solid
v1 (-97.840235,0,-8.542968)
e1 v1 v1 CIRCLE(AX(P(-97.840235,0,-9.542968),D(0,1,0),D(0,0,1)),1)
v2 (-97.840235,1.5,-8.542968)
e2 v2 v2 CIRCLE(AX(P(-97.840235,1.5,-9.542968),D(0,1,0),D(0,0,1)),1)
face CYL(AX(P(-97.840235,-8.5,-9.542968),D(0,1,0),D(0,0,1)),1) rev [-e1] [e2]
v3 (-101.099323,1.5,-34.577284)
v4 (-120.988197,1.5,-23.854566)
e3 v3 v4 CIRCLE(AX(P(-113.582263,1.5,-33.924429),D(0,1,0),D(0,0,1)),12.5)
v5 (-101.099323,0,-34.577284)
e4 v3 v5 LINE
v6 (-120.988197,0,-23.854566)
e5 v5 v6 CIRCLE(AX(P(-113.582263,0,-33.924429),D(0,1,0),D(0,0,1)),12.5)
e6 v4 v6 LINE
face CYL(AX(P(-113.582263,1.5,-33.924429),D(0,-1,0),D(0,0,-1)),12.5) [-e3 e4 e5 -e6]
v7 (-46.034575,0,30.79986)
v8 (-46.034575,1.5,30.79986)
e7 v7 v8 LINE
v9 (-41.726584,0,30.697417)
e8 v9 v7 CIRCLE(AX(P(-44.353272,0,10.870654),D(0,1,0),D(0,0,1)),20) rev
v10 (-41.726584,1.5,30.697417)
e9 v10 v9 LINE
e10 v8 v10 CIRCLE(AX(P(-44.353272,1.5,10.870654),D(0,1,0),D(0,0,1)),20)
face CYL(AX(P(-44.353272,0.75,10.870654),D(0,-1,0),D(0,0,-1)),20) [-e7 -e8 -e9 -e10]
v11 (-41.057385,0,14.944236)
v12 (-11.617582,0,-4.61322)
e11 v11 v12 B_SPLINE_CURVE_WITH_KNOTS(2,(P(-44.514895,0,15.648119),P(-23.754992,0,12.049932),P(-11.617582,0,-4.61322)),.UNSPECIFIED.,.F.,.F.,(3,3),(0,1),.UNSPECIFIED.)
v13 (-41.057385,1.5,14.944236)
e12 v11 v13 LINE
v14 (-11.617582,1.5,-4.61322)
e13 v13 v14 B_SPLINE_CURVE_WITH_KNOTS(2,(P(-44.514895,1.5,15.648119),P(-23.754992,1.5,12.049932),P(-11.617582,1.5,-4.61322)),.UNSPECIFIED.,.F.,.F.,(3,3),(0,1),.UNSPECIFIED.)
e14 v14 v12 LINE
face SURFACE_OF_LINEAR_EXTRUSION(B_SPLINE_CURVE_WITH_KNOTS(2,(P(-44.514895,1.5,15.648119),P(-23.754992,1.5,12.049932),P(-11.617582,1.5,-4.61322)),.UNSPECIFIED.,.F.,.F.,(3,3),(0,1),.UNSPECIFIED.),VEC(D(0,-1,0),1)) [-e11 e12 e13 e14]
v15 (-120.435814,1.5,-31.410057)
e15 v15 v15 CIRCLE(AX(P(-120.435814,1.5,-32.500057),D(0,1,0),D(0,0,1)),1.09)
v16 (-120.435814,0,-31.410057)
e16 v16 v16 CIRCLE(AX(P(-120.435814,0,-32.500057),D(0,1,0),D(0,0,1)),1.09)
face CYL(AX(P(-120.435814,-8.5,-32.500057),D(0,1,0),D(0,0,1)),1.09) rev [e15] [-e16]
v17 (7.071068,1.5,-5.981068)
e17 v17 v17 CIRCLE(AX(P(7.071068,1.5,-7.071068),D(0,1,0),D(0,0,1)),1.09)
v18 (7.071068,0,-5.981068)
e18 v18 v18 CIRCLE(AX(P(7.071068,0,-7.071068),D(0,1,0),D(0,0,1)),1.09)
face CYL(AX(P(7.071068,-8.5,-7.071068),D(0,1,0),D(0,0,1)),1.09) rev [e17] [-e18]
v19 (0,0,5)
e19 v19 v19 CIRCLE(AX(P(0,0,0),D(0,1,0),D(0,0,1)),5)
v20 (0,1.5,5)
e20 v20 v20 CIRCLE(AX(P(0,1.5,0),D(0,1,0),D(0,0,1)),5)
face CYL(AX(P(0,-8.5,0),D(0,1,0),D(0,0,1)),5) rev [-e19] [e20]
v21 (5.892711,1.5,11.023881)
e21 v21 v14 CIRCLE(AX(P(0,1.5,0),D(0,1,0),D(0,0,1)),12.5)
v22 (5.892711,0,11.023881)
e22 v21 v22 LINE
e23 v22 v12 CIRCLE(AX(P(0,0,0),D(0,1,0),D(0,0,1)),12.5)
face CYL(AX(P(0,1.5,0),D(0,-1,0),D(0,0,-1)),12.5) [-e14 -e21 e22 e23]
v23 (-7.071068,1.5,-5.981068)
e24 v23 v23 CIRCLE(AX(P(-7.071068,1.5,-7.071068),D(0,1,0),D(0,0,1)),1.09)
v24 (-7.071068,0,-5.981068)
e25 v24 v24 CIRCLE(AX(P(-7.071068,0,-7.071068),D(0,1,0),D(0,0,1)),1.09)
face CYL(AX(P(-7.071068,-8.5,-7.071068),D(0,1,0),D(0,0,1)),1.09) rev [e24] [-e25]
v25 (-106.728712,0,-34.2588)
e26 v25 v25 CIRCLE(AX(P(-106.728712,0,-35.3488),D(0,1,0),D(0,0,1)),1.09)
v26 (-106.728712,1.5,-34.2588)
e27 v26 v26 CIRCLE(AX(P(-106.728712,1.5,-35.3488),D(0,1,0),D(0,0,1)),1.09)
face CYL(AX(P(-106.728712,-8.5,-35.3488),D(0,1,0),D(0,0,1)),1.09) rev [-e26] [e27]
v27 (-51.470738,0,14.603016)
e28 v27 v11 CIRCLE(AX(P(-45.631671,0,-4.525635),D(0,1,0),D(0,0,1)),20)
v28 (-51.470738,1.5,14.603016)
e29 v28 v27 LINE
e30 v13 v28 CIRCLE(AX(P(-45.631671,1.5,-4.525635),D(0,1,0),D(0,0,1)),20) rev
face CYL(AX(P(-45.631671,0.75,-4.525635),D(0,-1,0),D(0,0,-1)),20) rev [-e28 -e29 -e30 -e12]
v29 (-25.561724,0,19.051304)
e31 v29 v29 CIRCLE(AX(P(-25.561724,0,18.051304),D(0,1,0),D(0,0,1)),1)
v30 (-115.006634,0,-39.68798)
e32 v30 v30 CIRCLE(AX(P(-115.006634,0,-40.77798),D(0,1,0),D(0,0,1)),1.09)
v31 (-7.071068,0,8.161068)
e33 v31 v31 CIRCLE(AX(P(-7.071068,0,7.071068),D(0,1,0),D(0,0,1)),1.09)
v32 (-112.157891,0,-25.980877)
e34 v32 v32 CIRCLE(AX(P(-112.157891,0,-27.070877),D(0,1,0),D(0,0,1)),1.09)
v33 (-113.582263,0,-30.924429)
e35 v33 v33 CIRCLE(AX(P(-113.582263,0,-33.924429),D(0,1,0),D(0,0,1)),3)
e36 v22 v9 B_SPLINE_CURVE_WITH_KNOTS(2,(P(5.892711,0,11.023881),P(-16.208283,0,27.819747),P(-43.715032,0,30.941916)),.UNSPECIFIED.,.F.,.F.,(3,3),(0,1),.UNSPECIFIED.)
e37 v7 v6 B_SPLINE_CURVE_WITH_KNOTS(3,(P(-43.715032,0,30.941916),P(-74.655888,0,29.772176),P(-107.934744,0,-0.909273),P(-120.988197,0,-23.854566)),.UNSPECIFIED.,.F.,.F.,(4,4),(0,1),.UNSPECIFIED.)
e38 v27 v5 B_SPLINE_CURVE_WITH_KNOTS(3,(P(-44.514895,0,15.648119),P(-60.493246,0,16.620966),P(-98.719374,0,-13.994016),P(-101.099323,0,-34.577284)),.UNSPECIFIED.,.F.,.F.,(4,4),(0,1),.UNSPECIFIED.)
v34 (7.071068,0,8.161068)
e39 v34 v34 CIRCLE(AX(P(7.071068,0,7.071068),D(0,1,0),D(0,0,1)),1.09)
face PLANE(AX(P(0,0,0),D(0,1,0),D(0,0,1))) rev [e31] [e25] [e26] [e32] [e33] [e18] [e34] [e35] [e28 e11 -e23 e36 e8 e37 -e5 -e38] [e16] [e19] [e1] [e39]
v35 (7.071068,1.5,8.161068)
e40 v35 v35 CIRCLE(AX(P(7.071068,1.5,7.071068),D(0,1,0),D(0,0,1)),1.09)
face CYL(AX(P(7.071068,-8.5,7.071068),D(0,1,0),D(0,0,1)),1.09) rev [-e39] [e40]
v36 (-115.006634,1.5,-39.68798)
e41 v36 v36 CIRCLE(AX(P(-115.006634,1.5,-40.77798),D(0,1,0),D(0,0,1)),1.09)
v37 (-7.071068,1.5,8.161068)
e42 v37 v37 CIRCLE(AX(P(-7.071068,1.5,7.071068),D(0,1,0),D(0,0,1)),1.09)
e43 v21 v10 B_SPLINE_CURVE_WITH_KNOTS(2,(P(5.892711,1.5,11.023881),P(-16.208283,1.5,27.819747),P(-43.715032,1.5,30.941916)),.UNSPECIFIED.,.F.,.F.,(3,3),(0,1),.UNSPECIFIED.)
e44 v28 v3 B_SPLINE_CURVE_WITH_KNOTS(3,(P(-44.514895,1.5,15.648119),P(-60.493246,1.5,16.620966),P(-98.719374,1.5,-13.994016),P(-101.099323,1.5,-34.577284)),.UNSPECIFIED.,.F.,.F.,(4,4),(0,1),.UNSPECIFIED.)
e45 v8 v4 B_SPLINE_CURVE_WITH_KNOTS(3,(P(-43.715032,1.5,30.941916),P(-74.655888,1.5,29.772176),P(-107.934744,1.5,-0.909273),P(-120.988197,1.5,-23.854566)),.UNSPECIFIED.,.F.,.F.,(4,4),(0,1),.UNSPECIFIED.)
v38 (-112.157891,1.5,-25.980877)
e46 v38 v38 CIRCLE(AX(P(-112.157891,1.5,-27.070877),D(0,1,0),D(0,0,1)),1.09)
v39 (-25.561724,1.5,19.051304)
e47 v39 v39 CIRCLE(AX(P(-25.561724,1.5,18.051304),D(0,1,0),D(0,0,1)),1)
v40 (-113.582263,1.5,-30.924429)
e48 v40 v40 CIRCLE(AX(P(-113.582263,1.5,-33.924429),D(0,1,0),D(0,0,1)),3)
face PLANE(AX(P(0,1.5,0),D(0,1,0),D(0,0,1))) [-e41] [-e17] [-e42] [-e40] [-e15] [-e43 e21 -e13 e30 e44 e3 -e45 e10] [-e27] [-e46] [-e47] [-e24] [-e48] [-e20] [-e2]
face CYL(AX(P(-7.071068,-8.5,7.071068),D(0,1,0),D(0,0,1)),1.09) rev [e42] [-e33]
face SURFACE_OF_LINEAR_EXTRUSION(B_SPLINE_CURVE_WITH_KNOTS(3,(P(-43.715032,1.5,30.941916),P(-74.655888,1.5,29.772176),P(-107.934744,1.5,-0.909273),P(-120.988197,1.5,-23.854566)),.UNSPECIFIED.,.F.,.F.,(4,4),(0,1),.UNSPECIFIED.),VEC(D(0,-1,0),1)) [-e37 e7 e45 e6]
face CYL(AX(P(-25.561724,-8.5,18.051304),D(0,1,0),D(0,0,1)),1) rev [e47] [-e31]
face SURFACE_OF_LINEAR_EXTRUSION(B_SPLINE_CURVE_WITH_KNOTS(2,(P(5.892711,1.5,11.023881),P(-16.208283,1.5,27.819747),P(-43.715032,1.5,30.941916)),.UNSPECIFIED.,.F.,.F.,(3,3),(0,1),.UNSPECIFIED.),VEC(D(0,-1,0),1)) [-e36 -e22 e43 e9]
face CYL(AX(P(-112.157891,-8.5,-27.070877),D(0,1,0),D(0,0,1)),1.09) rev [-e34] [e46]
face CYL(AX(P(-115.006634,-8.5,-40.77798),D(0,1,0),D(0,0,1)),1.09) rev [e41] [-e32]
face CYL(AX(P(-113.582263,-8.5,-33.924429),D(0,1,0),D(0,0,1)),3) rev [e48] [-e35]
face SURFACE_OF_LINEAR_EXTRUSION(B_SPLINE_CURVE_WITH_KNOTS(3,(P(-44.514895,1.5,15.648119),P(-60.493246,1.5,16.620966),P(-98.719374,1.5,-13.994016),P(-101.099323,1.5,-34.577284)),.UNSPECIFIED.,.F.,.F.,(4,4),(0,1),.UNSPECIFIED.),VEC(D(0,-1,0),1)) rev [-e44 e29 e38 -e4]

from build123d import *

# Parameters (mm, degrees)
BOSS_EXTRUDE1_DEPTH = 1.5
FILLET2_R           = 20
FILLET3_R           = 20
SKETCH3_R           = 5
SKETCH3_R_2         = 1.09
SKETCH3_R_3         = 3
CUT_EXTRUDE2_DEPTH  = 10
SKETCH4_R           = 1
CUT_EXTRUDE3_DEPTH  = 10


with BuildPart() as part:
    # Sketch2 → Boss-Extrude1 (new body)
    with BuildSketch(Plane(origin=(0, 0, 0), x_dir=(1, 0, 0), z_dir=(0, 1, 0))):
        with BuildLine():
            ThreePointArc((5.892711217, -11.0238811), (8.326059469, 9.323450741), (-11.617581648, 4.613219771))
            add(Edge.make_bspline(
                [(-44.514894976, -15.648119029), (-23.754992487, -12.049932399), (-11.617581648, 4.613219771)],
                knots=[0, 0, 0, 1, 1, 1], degree=2))
            add(Edge.make_bspline(
                [(-44.514894976, -15.648119029), (-60.493246192, -16.620966096), (-98.719374485, 13.99401616), (-101.099323327, 34.577284328)],
                knots=[0, 0, 0, 0, 1, 1, 1, 1], degree=3))
            ThreePointArc((-101.099323327, 34.577284328), (-119.514224633, 44.92723863), (-120.988196928, 23.854565571))
            add(Edge.make_bspline(
                [(-43.715031798, -30.941916126), (-74.6558876, -29.772176263), (-107.934743734, 0.909272839), (-120.988196928, 23.854565571)],
                knots=[0, 0, 0, 0, 1, 1, 1, 1], degree=3))
            add(Edge.make_bspline(
                [(5.892711217, -11.0238811), (-16.208282922, -27.819747246), (-43.715031798, -30.941916126)],
                knots=[0, 0, 0, 1, 1, 1], degree=2))
        make_face()
    extrude(amount=BOSS_EXTRUDE1_DEPTH)

    # Fillet2
    # the kernel refuses this fillet: 20 mm, written as the material it adds along each edge
    with BuildSketch(Plane(origin=(-44.514894976, 0, 15.648119029), x_dir=(0.9799001058370423, 0, -0.1994888031458243), z_dir=(0, 1, 0))) as fillet2_piece_1:
        with BuildLine():
            CenterArc((2.930109572, 19.991048267), FILLET2_R, 241.517996045, 30.196325972)
            Line((-6.607544605, 2.411709462), (-6.798297688, 2.060122686))
            ThreePointArc((-6.798297688, 2.060122686), (-3.555192588, 0.548576642), (-0.055827526, -0.39608495))
            Line((-0.055827526, -0.39608495), (-0.011685269, -0.399829282))
            ThreePointArc((-0.011685269, -0.399829282), (1.764140792, -0.426085985), (3.540398002, -0.399820965))
            Line((3.540398002, -0.399820965), (3.528431562, 0))
        make_face()
    extrude(amount=1.5)

    # Fillet3
    fillet3_edges = [part.edges().sort_by_distance(p)[0] for p in [
        (-43.715031798, 0.75, 30.941916126),
    ]]
    fillet(fillet3_edges, radius=FILLET3_R)

    # Sketch3 → Cut-Extrude2 (cut)
    with BuildSketch(Plane(origin=(0, 1.5, 0), x_dir=(1, 0, 0), z_dir=(0, 1, 0))):
        with Locations(Location((0, 0, 0), (0, 0, 270))):
            Circle(SKETCH3_R)
        with Locations(Location((-7.071067812, 7.071067812, 0), (0, 0, 270))):
            Circle(SKETCH3_R_2)
        with Locations(Location((7.071067812, 7.071067812, 0), (0, 0, 270))):
            Circle(SKETCH3_R_2)
        with Locations(Location((7.071067812, -7.071067812, 0), (0, 0, 270))):
            Circle(SKETCH3_R_2)
        with Locations(Location((-7.071067812, -7.071067812, 0), (0, 0, 270))):
            Circle(SKETCH3_R_2)
        with Locations(Location((-113.582262859, 33.924428557, 0), (0, 0, 270))):
            Circle(SKETCH3_R_3)
        with Locations(Location((-106.728711554, 35.34880018, 0), (0, 0, 270))):
            Circle(SKETCH3_R_2)
        with Locations(Location((-112.157891236, 27.070877253, 0), (0, 0, 270))):
            Circle(SKETCH3_R_2)
        with Locations(Location((-120.435814163, 32.500056934, 0), (0, 0, 270))):
            Circle(SKETCH3_R_2)
        with Locations(Location((-115.006634482, 40.777979862, 0), (0, 0, 270))):
            Circle(SKETCH3_R_2)
    extrude(amount=-CUT_EXTRUDE2_DEPTH, mode=Mode.SUBTRACT)

    # Sketch4 → Cut-Extrude3 (cut)
    with BuildSketch(Plane(origin=(0, 1.5, 0), x_dir=(1, 0, 0), z_dir=(0, 1, 0))):
        with Locations(Location((-97.840235061, 9.542968429, 0), (0, 0, 270))):
            Circle(SKETCH4_R)
        with Locations(Location((-25.561724323, -18.05130401, 0), (0, 0, 270))):
            Circle(SKETCH4_R)
    extrude(amount=-CUT_EXTRUDE3_DEPTH, mode=Mode.SUBTRACT)


solid = part.part
